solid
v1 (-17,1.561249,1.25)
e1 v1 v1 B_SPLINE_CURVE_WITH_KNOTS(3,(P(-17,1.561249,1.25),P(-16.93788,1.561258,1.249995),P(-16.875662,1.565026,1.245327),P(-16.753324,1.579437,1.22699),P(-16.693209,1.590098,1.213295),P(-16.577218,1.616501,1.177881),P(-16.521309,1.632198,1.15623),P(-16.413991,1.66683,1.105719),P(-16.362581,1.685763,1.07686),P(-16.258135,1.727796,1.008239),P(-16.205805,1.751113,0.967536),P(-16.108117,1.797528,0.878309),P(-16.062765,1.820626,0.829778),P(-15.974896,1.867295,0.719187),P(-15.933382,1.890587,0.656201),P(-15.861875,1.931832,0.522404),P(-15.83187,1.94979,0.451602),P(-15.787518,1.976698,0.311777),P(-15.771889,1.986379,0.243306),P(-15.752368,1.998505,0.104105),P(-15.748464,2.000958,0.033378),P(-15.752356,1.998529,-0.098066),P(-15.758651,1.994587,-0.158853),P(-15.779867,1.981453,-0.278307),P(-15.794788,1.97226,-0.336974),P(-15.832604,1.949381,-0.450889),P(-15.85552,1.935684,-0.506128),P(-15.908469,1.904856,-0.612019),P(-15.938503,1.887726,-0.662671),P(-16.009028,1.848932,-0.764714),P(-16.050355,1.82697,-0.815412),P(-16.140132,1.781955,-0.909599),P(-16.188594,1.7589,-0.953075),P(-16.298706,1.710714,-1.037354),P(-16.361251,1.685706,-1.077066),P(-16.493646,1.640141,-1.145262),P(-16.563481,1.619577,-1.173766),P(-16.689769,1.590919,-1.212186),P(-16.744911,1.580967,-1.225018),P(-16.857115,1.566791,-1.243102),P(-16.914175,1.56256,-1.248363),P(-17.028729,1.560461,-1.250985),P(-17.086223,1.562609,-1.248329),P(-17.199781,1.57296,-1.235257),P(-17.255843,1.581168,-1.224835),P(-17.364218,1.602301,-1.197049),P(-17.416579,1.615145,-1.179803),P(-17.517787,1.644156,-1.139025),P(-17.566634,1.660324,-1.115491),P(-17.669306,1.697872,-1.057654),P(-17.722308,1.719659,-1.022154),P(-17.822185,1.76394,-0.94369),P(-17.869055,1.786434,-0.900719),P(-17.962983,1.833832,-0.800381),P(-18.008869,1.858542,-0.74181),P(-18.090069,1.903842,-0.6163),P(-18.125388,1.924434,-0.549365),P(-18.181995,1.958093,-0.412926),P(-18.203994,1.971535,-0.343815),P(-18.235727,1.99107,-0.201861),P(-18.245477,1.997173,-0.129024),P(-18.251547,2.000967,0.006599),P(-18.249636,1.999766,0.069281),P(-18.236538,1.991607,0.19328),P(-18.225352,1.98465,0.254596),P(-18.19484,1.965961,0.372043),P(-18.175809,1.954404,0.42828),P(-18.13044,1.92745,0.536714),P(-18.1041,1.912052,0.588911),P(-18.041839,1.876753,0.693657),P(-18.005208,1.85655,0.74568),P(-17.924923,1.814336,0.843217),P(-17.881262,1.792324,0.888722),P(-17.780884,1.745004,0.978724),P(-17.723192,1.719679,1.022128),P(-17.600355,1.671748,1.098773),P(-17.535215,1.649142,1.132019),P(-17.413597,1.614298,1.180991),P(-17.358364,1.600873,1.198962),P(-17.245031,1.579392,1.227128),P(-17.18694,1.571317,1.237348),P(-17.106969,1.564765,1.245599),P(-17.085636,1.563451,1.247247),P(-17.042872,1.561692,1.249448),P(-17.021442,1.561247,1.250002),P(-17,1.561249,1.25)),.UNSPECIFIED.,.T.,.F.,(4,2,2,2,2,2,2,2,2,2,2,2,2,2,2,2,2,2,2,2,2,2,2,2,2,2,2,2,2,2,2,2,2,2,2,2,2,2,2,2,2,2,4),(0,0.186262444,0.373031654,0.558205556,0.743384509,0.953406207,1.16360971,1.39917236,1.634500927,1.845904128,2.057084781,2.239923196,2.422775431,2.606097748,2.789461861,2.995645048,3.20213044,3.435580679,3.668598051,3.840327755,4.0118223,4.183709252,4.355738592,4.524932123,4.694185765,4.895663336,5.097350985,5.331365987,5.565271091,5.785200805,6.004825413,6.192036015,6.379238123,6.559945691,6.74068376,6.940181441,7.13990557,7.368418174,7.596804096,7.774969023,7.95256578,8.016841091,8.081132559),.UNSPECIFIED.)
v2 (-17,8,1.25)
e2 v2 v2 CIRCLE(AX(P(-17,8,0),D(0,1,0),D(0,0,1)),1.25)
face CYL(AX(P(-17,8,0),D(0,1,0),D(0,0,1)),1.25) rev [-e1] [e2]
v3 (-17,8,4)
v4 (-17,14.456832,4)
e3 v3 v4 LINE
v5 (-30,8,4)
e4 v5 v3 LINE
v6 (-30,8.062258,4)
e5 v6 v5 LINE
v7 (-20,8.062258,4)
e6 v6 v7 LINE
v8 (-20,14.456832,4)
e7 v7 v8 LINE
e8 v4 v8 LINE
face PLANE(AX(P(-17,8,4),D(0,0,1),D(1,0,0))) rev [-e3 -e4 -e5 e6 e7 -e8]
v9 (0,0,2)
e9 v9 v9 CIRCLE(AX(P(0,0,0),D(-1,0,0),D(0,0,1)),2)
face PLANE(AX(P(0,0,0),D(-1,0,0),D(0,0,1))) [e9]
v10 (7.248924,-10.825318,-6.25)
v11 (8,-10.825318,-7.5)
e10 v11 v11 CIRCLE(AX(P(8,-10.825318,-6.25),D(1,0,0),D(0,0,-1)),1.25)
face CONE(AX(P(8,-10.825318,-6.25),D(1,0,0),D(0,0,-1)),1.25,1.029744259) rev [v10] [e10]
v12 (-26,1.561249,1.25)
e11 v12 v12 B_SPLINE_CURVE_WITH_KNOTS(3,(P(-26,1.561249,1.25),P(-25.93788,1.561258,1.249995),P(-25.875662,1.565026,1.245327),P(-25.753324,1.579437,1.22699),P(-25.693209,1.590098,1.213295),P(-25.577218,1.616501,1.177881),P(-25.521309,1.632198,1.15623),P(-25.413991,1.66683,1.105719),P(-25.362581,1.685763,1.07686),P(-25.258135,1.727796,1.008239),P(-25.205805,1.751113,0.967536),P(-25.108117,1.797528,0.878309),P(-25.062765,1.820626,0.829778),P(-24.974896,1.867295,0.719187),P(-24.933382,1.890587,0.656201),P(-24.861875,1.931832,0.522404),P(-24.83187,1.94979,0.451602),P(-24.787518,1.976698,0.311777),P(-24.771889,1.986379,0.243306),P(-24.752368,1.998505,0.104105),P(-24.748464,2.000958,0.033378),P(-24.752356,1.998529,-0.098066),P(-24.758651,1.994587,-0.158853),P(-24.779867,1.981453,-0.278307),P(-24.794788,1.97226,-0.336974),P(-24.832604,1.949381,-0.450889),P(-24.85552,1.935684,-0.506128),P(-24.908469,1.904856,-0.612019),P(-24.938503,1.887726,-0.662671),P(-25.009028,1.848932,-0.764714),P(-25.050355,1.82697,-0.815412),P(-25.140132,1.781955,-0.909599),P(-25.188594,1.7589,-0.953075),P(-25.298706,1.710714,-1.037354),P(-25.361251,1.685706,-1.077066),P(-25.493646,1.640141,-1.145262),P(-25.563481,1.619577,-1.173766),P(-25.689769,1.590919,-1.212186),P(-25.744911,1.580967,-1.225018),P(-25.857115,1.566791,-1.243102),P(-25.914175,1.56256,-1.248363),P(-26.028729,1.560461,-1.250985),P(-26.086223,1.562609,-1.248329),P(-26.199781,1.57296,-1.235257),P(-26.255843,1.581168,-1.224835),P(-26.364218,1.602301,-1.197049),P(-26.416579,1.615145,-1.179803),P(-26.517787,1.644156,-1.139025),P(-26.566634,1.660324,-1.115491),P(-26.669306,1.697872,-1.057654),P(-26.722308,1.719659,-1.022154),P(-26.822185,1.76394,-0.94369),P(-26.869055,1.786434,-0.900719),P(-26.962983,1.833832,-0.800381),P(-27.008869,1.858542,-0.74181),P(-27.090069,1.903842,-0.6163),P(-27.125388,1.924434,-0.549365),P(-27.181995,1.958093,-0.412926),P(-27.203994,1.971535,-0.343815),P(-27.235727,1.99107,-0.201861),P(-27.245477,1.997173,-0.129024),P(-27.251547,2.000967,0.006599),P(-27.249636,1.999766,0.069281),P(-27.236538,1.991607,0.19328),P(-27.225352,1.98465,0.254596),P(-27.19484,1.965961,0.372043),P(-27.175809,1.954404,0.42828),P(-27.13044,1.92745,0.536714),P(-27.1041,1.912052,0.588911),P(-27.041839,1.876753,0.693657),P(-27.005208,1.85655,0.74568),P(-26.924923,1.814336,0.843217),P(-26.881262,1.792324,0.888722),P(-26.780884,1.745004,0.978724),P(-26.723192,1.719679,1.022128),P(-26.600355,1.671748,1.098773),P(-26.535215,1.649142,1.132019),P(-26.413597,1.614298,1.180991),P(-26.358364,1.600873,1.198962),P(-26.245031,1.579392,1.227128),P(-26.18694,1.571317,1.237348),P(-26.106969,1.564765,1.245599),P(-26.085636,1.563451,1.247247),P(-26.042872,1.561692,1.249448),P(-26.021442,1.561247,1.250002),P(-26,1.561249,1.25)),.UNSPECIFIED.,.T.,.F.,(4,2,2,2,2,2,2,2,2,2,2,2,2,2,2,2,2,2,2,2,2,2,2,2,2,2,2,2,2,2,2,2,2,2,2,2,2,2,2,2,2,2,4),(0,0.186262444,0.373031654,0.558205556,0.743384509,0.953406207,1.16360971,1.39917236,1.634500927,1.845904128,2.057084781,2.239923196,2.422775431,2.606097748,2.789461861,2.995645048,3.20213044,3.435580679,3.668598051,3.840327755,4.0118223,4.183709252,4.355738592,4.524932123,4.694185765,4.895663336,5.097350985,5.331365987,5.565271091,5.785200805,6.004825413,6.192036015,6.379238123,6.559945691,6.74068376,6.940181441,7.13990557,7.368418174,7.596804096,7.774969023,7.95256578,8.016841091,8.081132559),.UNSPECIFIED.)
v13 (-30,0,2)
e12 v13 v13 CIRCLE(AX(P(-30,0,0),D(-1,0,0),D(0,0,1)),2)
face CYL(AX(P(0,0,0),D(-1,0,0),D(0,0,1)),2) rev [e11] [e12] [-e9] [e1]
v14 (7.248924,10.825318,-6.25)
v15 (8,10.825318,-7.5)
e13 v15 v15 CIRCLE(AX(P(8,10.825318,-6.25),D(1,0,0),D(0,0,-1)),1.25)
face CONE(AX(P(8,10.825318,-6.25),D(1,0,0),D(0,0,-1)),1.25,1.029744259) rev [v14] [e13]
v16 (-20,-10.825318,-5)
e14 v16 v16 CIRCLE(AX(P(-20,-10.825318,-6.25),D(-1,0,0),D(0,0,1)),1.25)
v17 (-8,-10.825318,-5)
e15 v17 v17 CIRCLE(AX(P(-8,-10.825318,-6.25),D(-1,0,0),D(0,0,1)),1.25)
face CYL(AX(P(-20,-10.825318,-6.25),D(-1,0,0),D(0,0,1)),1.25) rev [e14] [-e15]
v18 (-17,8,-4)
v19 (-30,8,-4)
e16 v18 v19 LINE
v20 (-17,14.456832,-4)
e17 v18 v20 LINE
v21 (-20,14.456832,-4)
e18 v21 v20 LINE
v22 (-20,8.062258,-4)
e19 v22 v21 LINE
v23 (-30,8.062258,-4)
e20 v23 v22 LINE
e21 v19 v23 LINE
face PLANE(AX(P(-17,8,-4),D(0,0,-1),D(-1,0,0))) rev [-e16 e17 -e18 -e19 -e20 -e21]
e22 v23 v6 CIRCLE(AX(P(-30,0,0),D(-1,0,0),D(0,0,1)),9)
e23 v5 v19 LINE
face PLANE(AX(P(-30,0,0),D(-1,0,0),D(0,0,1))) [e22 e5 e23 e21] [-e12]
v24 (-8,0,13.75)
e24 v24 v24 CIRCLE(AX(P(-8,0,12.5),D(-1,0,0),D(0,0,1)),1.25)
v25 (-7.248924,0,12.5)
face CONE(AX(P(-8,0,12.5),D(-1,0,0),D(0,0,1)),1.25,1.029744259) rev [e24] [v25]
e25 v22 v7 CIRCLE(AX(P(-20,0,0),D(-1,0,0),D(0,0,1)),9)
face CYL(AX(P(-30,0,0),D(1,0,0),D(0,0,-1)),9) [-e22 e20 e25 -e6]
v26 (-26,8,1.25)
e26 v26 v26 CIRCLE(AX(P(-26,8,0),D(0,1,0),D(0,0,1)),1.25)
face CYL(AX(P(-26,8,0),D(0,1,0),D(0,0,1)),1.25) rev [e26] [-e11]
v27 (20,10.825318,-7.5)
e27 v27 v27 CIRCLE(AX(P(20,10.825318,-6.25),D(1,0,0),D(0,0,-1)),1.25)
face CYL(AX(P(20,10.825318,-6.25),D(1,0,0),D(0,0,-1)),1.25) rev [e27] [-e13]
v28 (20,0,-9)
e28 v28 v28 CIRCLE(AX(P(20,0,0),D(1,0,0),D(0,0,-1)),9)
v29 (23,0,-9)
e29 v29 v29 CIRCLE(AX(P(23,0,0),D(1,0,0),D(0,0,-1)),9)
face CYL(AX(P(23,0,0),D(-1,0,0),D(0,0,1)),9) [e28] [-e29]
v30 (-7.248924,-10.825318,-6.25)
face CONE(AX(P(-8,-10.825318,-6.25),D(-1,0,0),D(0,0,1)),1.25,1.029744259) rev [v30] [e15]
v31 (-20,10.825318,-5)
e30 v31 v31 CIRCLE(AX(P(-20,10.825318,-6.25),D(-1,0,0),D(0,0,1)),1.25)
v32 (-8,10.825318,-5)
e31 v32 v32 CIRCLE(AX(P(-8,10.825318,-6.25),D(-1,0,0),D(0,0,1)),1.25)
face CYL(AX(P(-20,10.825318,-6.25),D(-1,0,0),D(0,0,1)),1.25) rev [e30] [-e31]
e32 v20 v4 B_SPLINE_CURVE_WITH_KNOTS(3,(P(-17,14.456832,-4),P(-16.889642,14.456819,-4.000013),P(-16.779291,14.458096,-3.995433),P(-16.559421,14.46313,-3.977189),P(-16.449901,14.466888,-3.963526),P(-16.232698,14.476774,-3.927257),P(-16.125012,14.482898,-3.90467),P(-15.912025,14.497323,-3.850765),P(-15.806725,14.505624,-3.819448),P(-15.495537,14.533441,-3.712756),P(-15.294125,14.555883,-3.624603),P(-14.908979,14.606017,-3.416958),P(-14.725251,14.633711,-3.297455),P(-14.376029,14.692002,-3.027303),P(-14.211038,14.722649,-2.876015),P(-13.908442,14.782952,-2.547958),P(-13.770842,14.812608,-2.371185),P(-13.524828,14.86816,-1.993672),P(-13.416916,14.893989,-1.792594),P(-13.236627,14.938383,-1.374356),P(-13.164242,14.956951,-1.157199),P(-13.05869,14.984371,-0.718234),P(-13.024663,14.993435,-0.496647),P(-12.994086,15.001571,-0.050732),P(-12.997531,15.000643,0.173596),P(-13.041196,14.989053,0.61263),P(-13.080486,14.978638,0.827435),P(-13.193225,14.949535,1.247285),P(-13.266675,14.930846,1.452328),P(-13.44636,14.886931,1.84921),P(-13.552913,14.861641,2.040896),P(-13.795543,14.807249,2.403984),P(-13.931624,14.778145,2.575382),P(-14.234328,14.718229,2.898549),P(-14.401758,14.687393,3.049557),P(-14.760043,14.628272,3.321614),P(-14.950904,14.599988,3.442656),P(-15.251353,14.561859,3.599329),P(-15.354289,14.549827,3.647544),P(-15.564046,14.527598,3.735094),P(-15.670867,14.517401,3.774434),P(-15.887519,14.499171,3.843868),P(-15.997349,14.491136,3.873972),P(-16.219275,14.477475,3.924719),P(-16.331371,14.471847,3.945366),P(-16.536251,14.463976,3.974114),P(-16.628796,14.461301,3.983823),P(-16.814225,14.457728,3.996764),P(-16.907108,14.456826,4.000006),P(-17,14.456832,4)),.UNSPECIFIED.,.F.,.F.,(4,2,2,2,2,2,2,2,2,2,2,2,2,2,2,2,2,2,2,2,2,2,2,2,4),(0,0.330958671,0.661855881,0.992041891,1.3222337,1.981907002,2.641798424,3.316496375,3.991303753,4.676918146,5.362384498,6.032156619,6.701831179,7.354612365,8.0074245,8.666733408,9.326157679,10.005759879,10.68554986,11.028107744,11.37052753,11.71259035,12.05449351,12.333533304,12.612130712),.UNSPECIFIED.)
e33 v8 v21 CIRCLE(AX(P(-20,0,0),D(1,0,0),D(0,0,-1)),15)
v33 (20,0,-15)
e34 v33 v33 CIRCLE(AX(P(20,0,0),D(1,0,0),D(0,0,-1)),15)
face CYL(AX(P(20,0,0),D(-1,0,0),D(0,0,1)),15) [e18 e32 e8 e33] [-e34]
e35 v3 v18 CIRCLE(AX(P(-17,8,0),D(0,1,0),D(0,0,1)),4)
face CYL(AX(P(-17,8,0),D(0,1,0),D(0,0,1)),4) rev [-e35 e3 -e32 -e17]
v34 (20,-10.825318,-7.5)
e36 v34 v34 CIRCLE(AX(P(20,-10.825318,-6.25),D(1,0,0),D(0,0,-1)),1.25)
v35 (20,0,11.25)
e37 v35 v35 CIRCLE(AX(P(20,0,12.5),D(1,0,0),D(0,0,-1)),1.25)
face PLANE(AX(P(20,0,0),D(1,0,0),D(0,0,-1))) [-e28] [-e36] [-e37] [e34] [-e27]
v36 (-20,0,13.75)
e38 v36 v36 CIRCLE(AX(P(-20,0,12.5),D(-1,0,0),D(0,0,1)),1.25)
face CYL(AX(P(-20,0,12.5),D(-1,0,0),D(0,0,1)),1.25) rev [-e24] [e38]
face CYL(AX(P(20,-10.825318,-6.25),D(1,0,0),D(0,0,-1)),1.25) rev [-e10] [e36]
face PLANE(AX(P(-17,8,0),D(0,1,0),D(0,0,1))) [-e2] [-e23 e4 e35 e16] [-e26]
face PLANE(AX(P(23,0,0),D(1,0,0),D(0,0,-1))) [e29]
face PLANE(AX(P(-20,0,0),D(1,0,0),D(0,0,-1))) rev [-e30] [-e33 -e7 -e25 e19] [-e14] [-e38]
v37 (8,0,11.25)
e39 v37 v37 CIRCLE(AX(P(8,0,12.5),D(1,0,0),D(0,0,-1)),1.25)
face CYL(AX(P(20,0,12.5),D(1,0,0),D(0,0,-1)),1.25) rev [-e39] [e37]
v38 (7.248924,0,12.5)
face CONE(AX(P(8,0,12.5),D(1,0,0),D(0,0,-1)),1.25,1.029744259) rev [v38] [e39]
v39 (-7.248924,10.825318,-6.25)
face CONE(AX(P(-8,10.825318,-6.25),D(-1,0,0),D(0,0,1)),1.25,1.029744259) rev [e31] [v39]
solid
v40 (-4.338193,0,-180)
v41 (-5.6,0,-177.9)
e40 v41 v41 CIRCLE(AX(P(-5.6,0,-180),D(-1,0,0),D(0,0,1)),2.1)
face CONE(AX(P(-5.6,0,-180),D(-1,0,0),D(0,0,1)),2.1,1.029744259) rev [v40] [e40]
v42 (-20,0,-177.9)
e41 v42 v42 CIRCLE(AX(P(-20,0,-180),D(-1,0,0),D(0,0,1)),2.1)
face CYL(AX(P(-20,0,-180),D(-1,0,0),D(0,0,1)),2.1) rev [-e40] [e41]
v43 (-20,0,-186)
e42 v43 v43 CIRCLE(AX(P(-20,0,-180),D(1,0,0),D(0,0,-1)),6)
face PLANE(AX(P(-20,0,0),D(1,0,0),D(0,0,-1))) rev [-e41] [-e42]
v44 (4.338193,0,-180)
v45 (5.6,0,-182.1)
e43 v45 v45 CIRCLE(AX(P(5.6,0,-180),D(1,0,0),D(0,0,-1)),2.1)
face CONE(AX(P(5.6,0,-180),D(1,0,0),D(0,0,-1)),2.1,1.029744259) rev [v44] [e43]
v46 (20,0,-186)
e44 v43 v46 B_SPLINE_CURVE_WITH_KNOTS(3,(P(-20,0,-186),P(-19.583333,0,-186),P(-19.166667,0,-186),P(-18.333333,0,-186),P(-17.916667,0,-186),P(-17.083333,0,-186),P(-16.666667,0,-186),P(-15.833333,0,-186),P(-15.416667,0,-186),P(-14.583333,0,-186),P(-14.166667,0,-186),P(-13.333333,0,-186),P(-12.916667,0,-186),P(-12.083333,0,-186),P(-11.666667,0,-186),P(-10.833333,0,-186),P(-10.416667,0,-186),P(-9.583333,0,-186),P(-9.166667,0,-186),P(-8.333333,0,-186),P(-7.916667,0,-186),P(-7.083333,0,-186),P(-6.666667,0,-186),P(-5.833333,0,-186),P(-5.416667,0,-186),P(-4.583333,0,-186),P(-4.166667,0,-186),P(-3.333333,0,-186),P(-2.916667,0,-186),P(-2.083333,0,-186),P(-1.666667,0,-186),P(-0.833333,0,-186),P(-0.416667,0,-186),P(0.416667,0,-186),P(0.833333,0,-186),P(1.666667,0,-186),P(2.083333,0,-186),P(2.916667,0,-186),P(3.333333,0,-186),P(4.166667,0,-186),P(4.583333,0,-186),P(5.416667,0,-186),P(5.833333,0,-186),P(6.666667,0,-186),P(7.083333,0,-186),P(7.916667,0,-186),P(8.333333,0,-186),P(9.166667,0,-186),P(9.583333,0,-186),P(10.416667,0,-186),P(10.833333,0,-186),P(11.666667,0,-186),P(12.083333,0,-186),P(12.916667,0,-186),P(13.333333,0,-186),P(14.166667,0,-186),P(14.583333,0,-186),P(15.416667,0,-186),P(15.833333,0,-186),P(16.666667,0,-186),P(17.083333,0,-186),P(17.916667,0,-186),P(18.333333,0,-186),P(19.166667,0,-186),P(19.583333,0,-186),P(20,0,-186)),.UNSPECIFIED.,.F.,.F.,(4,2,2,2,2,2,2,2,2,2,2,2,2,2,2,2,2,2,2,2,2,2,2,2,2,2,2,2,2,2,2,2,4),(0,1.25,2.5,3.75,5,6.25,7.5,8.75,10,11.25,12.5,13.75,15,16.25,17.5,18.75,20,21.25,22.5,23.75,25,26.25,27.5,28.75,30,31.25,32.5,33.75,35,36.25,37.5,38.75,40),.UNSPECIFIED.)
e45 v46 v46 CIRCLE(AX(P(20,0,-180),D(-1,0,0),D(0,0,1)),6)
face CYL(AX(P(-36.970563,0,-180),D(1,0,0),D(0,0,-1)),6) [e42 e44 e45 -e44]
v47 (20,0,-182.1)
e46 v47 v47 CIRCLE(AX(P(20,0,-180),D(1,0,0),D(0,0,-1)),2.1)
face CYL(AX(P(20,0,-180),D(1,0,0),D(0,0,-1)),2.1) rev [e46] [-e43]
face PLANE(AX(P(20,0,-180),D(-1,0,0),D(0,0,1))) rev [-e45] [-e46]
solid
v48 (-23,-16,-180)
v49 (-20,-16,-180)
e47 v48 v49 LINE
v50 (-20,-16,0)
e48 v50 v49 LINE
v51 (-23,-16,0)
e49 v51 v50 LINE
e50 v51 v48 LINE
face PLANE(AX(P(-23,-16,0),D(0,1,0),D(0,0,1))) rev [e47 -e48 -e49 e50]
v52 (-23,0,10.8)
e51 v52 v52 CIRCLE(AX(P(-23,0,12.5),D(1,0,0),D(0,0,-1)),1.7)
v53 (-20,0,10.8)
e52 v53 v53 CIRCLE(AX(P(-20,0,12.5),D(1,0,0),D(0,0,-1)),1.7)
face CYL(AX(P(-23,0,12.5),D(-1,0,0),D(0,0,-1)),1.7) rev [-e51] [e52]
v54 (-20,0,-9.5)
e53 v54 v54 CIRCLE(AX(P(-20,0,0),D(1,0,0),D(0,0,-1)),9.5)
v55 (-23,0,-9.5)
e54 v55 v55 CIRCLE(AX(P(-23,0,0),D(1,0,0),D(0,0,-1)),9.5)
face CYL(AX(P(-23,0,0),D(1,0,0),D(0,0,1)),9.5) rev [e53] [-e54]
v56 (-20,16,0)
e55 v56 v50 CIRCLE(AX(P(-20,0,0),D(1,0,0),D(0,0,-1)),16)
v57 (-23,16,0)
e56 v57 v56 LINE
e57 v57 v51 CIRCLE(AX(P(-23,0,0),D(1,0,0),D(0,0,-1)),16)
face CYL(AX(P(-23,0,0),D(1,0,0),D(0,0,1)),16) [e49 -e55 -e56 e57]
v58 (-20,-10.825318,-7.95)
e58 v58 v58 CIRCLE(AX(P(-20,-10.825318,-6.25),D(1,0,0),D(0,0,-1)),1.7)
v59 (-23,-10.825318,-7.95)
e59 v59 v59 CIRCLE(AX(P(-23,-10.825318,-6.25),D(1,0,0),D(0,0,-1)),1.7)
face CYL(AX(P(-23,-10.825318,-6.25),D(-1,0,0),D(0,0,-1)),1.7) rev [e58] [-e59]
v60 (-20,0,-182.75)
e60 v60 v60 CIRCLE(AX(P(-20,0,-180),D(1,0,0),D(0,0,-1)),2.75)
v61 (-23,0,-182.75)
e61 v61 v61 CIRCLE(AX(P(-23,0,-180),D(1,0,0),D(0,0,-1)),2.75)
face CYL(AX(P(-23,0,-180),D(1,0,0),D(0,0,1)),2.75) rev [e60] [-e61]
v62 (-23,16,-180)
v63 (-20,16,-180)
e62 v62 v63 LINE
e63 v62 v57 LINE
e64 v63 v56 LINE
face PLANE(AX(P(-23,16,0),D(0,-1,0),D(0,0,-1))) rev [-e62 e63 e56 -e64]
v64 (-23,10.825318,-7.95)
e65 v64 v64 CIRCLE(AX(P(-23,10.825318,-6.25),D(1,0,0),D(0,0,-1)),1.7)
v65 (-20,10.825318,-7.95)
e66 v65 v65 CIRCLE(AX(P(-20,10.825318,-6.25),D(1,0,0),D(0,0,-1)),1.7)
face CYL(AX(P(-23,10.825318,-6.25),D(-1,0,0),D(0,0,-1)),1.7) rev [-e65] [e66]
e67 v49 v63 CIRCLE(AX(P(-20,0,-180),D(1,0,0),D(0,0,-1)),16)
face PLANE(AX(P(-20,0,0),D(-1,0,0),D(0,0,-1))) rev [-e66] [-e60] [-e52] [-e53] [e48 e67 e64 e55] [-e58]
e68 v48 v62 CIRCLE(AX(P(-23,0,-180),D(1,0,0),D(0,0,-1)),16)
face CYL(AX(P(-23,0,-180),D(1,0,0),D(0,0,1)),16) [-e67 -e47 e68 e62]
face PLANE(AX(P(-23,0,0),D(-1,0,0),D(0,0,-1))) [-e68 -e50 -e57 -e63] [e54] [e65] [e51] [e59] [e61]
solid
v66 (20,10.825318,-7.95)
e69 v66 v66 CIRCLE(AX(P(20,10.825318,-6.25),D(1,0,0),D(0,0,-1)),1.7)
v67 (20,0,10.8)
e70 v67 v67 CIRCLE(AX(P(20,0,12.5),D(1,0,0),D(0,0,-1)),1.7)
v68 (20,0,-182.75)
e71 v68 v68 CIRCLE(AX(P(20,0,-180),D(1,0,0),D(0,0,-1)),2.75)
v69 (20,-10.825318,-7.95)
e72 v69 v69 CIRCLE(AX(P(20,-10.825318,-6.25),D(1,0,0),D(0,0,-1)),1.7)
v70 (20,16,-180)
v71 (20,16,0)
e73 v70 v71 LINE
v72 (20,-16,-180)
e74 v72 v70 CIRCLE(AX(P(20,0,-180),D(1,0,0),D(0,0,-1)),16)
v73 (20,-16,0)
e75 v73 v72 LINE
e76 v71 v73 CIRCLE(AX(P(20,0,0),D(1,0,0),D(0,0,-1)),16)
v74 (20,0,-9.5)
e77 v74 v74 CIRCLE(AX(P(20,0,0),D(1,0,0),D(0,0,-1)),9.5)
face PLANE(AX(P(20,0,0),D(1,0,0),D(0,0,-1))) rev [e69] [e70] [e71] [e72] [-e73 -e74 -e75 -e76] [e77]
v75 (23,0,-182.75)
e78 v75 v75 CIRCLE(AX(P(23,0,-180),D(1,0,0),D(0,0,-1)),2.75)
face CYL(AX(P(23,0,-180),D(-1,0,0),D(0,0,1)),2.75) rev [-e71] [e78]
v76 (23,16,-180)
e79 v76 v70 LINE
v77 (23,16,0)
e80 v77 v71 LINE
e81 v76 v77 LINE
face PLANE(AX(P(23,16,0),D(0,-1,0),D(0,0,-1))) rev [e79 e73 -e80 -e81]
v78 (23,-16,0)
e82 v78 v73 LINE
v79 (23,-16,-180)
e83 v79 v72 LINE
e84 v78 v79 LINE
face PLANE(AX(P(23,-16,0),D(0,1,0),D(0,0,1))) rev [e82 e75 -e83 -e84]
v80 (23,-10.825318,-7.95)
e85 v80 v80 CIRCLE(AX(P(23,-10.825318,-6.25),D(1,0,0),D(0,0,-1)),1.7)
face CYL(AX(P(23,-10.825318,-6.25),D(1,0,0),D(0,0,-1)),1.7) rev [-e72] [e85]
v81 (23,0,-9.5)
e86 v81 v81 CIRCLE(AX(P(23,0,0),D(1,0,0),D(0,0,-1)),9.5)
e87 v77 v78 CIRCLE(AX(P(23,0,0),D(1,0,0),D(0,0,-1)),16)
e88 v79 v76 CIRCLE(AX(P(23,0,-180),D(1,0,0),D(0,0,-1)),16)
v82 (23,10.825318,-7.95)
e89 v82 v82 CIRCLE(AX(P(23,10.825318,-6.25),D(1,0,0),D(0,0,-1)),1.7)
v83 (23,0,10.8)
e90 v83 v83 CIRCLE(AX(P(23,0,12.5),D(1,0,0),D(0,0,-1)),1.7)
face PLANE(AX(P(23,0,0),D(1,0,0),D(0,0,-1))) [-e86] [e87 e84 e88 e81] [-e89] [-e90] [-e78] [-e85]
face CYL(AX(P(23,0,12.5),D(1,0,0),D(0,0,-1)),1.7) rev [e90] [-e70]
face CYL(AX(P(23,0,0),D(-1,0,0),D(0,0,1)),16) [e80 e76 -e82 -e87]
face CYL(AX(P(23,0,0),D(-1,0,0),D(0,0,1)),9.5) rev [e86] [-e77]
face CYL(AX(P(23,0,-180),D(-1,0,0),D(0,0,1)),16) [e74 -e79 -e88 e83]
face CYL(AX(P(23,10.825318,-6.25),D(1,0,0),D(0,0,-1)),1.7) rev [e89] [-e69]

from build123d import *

# Parameters (mm, degrees)
SKETCH1_R                    = 15
BOSS_EXTRUDE1_DEPTH          = 20
SKETCH11_R                   = 9
BOSS_EXTRUDE4_DEPTH          = 10
BOSS_EXTRUDE5_START          = 3
SKETCH12_R                   = 9
BOSS_EXTRUDE5_DEPTH          = 3
SKETCH2_R                    = 2.75
SKETCH2_R_2                  = 9.5
BOSS_EXTRUDE2_DEPTH          = 3
SKETCH13_R                   = 6
BOSS_EXTRUDE6_DEPTH          = 40
M3_START                     = 20
M3_CLEARANCE_HOLE1_OUTLINE_R = 1.7
M3_CLEARANCE_HOLE1_DEPTH     = 3
CUT_EXTRUDE1_DEPTH           = 8
CUT_EXTRUDE3_DEPTH           = 202.298286133
SKETCH16_R                   = 2
CUT_EXTRUDE2_DEPTH           = 30
SKETCH18_W                   = 1.25
SKETCH18_H                   = 8
M3_TAPPED_HOLE2_AT_2_COUNT   = 2
M3_TAPPED_HOLE2_AT_2_PITCH   = 9
M3_TAPPED_HOLE1_AT_2_COUNT   = 2
M3_TAPPED_HOLE1_AT_2_PITCH   = 21.650635095
M3_TAPPED_HOLE1_AT_3_COUNT   = 2
M3_TAPPED_HOLE1_AT_3_PITCH   = 21.650635095


# Read off the part's stored shape, not the designer's step: M3 Clearance Hole1
with BuildPart() as part:
    # Sketch1 → Boss-Extrude1 (new, symmetric)
    with BuildSketch(Plane(origin=(0, 0, 0), x_dir=(0, 0, -1), z_dir=(1, 0, 0))):
        Circle(SKETCH1_R)
    extrude(amount=BOSS_EXTRUDE1_DEPTH, both=True)

    # Sketch11 → Boss-Extrude4 (add)
    with BuildSketch(Plane.ZY.offset(20)):
        Circle(SKETCH11_R)
    extrude(amount=BOSS_EXTRUDE4_DEPTH)

    # Sketch12 → Boss-Extrude5 (add)
    with BuildSketch(Plane(origin=(20, 0, 0), x_dir=(0, 0, -1), z_dir=(1, 0, 0)).offset(BOSS_EXTRUDE5_START)):
        with Locations(Location((0, 0, 0), (0, 0, 180))):
            Circle(SKETCH12_R)
    extrude(amount=-BOSS_EXTRUDE5_DEPTH)

    # Sketch15 → Cut-Extrude1 (cut)
    with BuildSketch(Plane(origin=(0, 16, 0), x_dir=(1, 0, 0), z_dir=(0, 1, 0))):
        with BuildLine():
            Line((-17, -4), (-20, -4))
            Line((-20, -4), (-20, 4))
            Line((-20, 4), (-17, 4))
            ThreePointArc((-17, 4), (-13, 0), (-17, -4))
        make_face()
    extrude(amount=-CUT_EXTRUDE1_DEPTH, mode=Mode.SUBTRACT)

    # Sketch23 → Cut-Extrude3 (cut, through all)
    with BuildSketch(Plane(origin=(-20, 0, 0), x_dir=(0, 0, -1), z_dir=(1, 0, 0))):
        with BuildLine():
            Line((-4, 8), (4, 8))
            Line((4, 8), (4, 8.062257748))
            ThreePointArc((4, 8.062257748), (0, 9), (-4, 8.062257748))
            Line((-4, 8.062257748), (-4, 8))
        make_face()
    extrude(amount=-CUT_EXTRUDE3_DEPTH, mode=Mode.SUBTRACT)

    # Sketch16 → Cut-Extrude2 (cut)
    with BuildSketch(Plane.ZY.offset(30)):
        Circle(SKETCH16_R)
    extrude(amount=-CUT_EXTRUDE2_DEPTH, mode=Mode.SUBTRACT)

    # Sketch18 → M3 Tapped Hole2 (revolve, cut)
    with BuildSketch(Plane(origin=(-17, 8, 0), x_dir=(0, 0, 1), z_dir=(1, 0, 0))):
        with Locations((0.625, 4)):
            Rectangle(SKETCH18_W, SKETCH18_H)
    m3_tapped_hole2 = revolve(axis=Axis((-17, 14.35, 0), (0, -1, 0)), mode=Mode.SUBTRACT)

    # M3 Tapped Hole2 at 2: M3 Tapped Hole2 ×2
    with Locations(*[(-i * M3_TAPPED_HOLE2_AT_2_PITCH, 0, 0) for i in range(1, M3_TAPPED_HOLE2_AT_2_COUNT)]):
        add(m3_tapped_hole2, mode=Mode.SUBTRACT)

    # Sketch21 → M3 Tapped Hole1 (revolve, cut)
    with BuildSketch(Plane(origin=(20, 0, 12.5), x_dir=(0, 0, -1), z_dir=(0, 1, 0))):
        Polygon((0, 0), (0, 12.751075774), (1.25, 12), (1.25, 0), align=None)
    m3_tapped_hole1 = revolve(axis=Axis((26.35, 0, 12.5), (-1, 0, 0)), mode=Mode.SUBTRACT)

    # M3 Tapped Hole1 at 2: M3 Tapped Hole1 ×2
    with Locations(*[Vector(0, 0.5000000000000012, -0.866025403784438) * (i * M3_TAPPED_HOLE1_AT_2_PITCH) for i in range(1, M3_TAPPED_HOLE1_AT_2_COUNT)]):
        add(m3_tapped_hole1, mode=Mode.SUBTRACT)

    # M3 Tapped Hole1 at 3: M3 Tapped Hole1 ×2
    with Locations(*[Vector(0, -0.500000000000001, -0.866025403784438) * (i * M3_TAPPED_HOLE1_AT_3_PITCH) for i in range(1, M3_TAPPED_HOLE1_AT_3_COUNT)]):
        add(m3_tapped_hole1, mode=Mode.SUBTRACT)

    # Mirror6: M3 Tapped Hole1 across plane
    add(m3_tapped_hole1.mirror(Plane(origin=(0, 0, 0), x_dir=(0, 0, 1), z_dir=(1, 0, 0))), mode=Mode.SUBTRACT)

    # Mirror6 copy 1 sketch → Mirror6 copy 1 (revolve, cut)
    with BuildSketch(Plane(origin=(-20, 10.825317547, -6.25), x_dir=(0, 0, -1), z_dir=(0, 1, 0))):
        Polygon((0, 0), (0, -12.751075774), (1.25, -12), (1.25, 0), align=None)
    revolve(axis=Axis((-26.35, 10.825317547, -6.25), (-1, 0, 0)), mode=Mode.SUBTRACT)

    # Mirror6 copy 2 sketch → Mirror6 copy 2 (revolve, cut)
    with BuildSketch(Plane(origin=(-20, -10.825317547, -6.25), x_dir=(0, 0, -1), z_dir=(0, 1, 0))):
        Polygon((0, 0), (0, -12.751075774), (1.25, -12), (1.25, 0), align=None)
    revolve(axis=Axis((-26.35, -10.825317547, -6.25), (-1, 0, 0)), mode=Mode.SUBTRACT)


with BuildPart() as body_2:
    # Sketch2 → Boss-Extrude2 (new body)
    with BuildSketch(Plane(origin=(20, 0, 0), x_dir=(0, 0, -1), z_dir=(1, 0, 0))):
        with BuildLine():
            Line((0, 16), (180, 16))
            ThreePointArc((180, 16), (196, 0), (180, -16))
            Line((180, -16), (0, -16))
            ThreePointArc((0, -16), (-16, 0), (0, 16))
        make_face()
        with Locations((180, 0)):
            Circle(SKETCH2_R, mode=Mode.SUBTRACT)
        Circle(SKETCH2_R_2, mode=Mode.SUBTRACT)
    extrude(amount=BOSS_EXTRUDE2_DEPTH)

    # M3 Clearance Hole1 outline → M3 Clearance Hole1 (cut)
    with BuildSketch(Plane.YZ.offset(M3_START)):
        with Locations((-10.825317547, -6.25)):
            Circle(M3_CLEARANCE_HOLE1_OUTLINE_R)
        with Locations((0, 12.5)):
            Circle(M3_CLEARANCE_HOLE1_OUTLINE_R)
        with Locations((10.825317547, -6.25)):
            Circle(M3_CLEARANCE_HOLE1_OUTLINE_R)
    extrude(amount=M3_CLEARANCE_HOLE1_DEPTH, mode=Mode.SUBTRACT)


with BuildPart() as body_3:
    # Sketch13 → Boss-Extrude6 (new body)
    with BuildSketch(Plane.ZY.offset(-20)):
        with Locations(Location((-180, 0, 0), (0, 0, 180))):
            Circle(SKETCH13_R)
    extrude(amount=BOSS_EXTRUDE6_DEPTH)

    # Sketch27 → M5 Tapped Hole1 (revolve, cut)
    with BuildSketch(Plane(origin=(20, 0, -180), x_dir=(0, 0, -1), z_dir=(0, 1, 0))):
        Polygon((0, 0), (0, 15.6618073), (2.1, 14.4), (2.1, 0), align=None)
    m5_tapped_hole1 = revolve(axis=Axis((26.35, 0, -180), (-1, 0, 0)), mode=Mode.SUBTRACT)

    # Mirror7: M5 Tapped Hole1 across plane
    add(m5_tapped_hole1.mirror(Plane(origin=(0, 0, 0), x_dir=(0, 0, 1), z_dir=(1, 0, 0))), mode=Mode.SUBTRACT)


with BuildPart() as body_4:
    # Mirror2: mirrored copy
    add(body_2.part.mirror(Plane(origin=(0, 0, 0), x_dir=(0, 0, 1), z_dir=(1, 0, 0))))


solid = Compound([part.part, body_2.part, body_3.part, body_4.part])
